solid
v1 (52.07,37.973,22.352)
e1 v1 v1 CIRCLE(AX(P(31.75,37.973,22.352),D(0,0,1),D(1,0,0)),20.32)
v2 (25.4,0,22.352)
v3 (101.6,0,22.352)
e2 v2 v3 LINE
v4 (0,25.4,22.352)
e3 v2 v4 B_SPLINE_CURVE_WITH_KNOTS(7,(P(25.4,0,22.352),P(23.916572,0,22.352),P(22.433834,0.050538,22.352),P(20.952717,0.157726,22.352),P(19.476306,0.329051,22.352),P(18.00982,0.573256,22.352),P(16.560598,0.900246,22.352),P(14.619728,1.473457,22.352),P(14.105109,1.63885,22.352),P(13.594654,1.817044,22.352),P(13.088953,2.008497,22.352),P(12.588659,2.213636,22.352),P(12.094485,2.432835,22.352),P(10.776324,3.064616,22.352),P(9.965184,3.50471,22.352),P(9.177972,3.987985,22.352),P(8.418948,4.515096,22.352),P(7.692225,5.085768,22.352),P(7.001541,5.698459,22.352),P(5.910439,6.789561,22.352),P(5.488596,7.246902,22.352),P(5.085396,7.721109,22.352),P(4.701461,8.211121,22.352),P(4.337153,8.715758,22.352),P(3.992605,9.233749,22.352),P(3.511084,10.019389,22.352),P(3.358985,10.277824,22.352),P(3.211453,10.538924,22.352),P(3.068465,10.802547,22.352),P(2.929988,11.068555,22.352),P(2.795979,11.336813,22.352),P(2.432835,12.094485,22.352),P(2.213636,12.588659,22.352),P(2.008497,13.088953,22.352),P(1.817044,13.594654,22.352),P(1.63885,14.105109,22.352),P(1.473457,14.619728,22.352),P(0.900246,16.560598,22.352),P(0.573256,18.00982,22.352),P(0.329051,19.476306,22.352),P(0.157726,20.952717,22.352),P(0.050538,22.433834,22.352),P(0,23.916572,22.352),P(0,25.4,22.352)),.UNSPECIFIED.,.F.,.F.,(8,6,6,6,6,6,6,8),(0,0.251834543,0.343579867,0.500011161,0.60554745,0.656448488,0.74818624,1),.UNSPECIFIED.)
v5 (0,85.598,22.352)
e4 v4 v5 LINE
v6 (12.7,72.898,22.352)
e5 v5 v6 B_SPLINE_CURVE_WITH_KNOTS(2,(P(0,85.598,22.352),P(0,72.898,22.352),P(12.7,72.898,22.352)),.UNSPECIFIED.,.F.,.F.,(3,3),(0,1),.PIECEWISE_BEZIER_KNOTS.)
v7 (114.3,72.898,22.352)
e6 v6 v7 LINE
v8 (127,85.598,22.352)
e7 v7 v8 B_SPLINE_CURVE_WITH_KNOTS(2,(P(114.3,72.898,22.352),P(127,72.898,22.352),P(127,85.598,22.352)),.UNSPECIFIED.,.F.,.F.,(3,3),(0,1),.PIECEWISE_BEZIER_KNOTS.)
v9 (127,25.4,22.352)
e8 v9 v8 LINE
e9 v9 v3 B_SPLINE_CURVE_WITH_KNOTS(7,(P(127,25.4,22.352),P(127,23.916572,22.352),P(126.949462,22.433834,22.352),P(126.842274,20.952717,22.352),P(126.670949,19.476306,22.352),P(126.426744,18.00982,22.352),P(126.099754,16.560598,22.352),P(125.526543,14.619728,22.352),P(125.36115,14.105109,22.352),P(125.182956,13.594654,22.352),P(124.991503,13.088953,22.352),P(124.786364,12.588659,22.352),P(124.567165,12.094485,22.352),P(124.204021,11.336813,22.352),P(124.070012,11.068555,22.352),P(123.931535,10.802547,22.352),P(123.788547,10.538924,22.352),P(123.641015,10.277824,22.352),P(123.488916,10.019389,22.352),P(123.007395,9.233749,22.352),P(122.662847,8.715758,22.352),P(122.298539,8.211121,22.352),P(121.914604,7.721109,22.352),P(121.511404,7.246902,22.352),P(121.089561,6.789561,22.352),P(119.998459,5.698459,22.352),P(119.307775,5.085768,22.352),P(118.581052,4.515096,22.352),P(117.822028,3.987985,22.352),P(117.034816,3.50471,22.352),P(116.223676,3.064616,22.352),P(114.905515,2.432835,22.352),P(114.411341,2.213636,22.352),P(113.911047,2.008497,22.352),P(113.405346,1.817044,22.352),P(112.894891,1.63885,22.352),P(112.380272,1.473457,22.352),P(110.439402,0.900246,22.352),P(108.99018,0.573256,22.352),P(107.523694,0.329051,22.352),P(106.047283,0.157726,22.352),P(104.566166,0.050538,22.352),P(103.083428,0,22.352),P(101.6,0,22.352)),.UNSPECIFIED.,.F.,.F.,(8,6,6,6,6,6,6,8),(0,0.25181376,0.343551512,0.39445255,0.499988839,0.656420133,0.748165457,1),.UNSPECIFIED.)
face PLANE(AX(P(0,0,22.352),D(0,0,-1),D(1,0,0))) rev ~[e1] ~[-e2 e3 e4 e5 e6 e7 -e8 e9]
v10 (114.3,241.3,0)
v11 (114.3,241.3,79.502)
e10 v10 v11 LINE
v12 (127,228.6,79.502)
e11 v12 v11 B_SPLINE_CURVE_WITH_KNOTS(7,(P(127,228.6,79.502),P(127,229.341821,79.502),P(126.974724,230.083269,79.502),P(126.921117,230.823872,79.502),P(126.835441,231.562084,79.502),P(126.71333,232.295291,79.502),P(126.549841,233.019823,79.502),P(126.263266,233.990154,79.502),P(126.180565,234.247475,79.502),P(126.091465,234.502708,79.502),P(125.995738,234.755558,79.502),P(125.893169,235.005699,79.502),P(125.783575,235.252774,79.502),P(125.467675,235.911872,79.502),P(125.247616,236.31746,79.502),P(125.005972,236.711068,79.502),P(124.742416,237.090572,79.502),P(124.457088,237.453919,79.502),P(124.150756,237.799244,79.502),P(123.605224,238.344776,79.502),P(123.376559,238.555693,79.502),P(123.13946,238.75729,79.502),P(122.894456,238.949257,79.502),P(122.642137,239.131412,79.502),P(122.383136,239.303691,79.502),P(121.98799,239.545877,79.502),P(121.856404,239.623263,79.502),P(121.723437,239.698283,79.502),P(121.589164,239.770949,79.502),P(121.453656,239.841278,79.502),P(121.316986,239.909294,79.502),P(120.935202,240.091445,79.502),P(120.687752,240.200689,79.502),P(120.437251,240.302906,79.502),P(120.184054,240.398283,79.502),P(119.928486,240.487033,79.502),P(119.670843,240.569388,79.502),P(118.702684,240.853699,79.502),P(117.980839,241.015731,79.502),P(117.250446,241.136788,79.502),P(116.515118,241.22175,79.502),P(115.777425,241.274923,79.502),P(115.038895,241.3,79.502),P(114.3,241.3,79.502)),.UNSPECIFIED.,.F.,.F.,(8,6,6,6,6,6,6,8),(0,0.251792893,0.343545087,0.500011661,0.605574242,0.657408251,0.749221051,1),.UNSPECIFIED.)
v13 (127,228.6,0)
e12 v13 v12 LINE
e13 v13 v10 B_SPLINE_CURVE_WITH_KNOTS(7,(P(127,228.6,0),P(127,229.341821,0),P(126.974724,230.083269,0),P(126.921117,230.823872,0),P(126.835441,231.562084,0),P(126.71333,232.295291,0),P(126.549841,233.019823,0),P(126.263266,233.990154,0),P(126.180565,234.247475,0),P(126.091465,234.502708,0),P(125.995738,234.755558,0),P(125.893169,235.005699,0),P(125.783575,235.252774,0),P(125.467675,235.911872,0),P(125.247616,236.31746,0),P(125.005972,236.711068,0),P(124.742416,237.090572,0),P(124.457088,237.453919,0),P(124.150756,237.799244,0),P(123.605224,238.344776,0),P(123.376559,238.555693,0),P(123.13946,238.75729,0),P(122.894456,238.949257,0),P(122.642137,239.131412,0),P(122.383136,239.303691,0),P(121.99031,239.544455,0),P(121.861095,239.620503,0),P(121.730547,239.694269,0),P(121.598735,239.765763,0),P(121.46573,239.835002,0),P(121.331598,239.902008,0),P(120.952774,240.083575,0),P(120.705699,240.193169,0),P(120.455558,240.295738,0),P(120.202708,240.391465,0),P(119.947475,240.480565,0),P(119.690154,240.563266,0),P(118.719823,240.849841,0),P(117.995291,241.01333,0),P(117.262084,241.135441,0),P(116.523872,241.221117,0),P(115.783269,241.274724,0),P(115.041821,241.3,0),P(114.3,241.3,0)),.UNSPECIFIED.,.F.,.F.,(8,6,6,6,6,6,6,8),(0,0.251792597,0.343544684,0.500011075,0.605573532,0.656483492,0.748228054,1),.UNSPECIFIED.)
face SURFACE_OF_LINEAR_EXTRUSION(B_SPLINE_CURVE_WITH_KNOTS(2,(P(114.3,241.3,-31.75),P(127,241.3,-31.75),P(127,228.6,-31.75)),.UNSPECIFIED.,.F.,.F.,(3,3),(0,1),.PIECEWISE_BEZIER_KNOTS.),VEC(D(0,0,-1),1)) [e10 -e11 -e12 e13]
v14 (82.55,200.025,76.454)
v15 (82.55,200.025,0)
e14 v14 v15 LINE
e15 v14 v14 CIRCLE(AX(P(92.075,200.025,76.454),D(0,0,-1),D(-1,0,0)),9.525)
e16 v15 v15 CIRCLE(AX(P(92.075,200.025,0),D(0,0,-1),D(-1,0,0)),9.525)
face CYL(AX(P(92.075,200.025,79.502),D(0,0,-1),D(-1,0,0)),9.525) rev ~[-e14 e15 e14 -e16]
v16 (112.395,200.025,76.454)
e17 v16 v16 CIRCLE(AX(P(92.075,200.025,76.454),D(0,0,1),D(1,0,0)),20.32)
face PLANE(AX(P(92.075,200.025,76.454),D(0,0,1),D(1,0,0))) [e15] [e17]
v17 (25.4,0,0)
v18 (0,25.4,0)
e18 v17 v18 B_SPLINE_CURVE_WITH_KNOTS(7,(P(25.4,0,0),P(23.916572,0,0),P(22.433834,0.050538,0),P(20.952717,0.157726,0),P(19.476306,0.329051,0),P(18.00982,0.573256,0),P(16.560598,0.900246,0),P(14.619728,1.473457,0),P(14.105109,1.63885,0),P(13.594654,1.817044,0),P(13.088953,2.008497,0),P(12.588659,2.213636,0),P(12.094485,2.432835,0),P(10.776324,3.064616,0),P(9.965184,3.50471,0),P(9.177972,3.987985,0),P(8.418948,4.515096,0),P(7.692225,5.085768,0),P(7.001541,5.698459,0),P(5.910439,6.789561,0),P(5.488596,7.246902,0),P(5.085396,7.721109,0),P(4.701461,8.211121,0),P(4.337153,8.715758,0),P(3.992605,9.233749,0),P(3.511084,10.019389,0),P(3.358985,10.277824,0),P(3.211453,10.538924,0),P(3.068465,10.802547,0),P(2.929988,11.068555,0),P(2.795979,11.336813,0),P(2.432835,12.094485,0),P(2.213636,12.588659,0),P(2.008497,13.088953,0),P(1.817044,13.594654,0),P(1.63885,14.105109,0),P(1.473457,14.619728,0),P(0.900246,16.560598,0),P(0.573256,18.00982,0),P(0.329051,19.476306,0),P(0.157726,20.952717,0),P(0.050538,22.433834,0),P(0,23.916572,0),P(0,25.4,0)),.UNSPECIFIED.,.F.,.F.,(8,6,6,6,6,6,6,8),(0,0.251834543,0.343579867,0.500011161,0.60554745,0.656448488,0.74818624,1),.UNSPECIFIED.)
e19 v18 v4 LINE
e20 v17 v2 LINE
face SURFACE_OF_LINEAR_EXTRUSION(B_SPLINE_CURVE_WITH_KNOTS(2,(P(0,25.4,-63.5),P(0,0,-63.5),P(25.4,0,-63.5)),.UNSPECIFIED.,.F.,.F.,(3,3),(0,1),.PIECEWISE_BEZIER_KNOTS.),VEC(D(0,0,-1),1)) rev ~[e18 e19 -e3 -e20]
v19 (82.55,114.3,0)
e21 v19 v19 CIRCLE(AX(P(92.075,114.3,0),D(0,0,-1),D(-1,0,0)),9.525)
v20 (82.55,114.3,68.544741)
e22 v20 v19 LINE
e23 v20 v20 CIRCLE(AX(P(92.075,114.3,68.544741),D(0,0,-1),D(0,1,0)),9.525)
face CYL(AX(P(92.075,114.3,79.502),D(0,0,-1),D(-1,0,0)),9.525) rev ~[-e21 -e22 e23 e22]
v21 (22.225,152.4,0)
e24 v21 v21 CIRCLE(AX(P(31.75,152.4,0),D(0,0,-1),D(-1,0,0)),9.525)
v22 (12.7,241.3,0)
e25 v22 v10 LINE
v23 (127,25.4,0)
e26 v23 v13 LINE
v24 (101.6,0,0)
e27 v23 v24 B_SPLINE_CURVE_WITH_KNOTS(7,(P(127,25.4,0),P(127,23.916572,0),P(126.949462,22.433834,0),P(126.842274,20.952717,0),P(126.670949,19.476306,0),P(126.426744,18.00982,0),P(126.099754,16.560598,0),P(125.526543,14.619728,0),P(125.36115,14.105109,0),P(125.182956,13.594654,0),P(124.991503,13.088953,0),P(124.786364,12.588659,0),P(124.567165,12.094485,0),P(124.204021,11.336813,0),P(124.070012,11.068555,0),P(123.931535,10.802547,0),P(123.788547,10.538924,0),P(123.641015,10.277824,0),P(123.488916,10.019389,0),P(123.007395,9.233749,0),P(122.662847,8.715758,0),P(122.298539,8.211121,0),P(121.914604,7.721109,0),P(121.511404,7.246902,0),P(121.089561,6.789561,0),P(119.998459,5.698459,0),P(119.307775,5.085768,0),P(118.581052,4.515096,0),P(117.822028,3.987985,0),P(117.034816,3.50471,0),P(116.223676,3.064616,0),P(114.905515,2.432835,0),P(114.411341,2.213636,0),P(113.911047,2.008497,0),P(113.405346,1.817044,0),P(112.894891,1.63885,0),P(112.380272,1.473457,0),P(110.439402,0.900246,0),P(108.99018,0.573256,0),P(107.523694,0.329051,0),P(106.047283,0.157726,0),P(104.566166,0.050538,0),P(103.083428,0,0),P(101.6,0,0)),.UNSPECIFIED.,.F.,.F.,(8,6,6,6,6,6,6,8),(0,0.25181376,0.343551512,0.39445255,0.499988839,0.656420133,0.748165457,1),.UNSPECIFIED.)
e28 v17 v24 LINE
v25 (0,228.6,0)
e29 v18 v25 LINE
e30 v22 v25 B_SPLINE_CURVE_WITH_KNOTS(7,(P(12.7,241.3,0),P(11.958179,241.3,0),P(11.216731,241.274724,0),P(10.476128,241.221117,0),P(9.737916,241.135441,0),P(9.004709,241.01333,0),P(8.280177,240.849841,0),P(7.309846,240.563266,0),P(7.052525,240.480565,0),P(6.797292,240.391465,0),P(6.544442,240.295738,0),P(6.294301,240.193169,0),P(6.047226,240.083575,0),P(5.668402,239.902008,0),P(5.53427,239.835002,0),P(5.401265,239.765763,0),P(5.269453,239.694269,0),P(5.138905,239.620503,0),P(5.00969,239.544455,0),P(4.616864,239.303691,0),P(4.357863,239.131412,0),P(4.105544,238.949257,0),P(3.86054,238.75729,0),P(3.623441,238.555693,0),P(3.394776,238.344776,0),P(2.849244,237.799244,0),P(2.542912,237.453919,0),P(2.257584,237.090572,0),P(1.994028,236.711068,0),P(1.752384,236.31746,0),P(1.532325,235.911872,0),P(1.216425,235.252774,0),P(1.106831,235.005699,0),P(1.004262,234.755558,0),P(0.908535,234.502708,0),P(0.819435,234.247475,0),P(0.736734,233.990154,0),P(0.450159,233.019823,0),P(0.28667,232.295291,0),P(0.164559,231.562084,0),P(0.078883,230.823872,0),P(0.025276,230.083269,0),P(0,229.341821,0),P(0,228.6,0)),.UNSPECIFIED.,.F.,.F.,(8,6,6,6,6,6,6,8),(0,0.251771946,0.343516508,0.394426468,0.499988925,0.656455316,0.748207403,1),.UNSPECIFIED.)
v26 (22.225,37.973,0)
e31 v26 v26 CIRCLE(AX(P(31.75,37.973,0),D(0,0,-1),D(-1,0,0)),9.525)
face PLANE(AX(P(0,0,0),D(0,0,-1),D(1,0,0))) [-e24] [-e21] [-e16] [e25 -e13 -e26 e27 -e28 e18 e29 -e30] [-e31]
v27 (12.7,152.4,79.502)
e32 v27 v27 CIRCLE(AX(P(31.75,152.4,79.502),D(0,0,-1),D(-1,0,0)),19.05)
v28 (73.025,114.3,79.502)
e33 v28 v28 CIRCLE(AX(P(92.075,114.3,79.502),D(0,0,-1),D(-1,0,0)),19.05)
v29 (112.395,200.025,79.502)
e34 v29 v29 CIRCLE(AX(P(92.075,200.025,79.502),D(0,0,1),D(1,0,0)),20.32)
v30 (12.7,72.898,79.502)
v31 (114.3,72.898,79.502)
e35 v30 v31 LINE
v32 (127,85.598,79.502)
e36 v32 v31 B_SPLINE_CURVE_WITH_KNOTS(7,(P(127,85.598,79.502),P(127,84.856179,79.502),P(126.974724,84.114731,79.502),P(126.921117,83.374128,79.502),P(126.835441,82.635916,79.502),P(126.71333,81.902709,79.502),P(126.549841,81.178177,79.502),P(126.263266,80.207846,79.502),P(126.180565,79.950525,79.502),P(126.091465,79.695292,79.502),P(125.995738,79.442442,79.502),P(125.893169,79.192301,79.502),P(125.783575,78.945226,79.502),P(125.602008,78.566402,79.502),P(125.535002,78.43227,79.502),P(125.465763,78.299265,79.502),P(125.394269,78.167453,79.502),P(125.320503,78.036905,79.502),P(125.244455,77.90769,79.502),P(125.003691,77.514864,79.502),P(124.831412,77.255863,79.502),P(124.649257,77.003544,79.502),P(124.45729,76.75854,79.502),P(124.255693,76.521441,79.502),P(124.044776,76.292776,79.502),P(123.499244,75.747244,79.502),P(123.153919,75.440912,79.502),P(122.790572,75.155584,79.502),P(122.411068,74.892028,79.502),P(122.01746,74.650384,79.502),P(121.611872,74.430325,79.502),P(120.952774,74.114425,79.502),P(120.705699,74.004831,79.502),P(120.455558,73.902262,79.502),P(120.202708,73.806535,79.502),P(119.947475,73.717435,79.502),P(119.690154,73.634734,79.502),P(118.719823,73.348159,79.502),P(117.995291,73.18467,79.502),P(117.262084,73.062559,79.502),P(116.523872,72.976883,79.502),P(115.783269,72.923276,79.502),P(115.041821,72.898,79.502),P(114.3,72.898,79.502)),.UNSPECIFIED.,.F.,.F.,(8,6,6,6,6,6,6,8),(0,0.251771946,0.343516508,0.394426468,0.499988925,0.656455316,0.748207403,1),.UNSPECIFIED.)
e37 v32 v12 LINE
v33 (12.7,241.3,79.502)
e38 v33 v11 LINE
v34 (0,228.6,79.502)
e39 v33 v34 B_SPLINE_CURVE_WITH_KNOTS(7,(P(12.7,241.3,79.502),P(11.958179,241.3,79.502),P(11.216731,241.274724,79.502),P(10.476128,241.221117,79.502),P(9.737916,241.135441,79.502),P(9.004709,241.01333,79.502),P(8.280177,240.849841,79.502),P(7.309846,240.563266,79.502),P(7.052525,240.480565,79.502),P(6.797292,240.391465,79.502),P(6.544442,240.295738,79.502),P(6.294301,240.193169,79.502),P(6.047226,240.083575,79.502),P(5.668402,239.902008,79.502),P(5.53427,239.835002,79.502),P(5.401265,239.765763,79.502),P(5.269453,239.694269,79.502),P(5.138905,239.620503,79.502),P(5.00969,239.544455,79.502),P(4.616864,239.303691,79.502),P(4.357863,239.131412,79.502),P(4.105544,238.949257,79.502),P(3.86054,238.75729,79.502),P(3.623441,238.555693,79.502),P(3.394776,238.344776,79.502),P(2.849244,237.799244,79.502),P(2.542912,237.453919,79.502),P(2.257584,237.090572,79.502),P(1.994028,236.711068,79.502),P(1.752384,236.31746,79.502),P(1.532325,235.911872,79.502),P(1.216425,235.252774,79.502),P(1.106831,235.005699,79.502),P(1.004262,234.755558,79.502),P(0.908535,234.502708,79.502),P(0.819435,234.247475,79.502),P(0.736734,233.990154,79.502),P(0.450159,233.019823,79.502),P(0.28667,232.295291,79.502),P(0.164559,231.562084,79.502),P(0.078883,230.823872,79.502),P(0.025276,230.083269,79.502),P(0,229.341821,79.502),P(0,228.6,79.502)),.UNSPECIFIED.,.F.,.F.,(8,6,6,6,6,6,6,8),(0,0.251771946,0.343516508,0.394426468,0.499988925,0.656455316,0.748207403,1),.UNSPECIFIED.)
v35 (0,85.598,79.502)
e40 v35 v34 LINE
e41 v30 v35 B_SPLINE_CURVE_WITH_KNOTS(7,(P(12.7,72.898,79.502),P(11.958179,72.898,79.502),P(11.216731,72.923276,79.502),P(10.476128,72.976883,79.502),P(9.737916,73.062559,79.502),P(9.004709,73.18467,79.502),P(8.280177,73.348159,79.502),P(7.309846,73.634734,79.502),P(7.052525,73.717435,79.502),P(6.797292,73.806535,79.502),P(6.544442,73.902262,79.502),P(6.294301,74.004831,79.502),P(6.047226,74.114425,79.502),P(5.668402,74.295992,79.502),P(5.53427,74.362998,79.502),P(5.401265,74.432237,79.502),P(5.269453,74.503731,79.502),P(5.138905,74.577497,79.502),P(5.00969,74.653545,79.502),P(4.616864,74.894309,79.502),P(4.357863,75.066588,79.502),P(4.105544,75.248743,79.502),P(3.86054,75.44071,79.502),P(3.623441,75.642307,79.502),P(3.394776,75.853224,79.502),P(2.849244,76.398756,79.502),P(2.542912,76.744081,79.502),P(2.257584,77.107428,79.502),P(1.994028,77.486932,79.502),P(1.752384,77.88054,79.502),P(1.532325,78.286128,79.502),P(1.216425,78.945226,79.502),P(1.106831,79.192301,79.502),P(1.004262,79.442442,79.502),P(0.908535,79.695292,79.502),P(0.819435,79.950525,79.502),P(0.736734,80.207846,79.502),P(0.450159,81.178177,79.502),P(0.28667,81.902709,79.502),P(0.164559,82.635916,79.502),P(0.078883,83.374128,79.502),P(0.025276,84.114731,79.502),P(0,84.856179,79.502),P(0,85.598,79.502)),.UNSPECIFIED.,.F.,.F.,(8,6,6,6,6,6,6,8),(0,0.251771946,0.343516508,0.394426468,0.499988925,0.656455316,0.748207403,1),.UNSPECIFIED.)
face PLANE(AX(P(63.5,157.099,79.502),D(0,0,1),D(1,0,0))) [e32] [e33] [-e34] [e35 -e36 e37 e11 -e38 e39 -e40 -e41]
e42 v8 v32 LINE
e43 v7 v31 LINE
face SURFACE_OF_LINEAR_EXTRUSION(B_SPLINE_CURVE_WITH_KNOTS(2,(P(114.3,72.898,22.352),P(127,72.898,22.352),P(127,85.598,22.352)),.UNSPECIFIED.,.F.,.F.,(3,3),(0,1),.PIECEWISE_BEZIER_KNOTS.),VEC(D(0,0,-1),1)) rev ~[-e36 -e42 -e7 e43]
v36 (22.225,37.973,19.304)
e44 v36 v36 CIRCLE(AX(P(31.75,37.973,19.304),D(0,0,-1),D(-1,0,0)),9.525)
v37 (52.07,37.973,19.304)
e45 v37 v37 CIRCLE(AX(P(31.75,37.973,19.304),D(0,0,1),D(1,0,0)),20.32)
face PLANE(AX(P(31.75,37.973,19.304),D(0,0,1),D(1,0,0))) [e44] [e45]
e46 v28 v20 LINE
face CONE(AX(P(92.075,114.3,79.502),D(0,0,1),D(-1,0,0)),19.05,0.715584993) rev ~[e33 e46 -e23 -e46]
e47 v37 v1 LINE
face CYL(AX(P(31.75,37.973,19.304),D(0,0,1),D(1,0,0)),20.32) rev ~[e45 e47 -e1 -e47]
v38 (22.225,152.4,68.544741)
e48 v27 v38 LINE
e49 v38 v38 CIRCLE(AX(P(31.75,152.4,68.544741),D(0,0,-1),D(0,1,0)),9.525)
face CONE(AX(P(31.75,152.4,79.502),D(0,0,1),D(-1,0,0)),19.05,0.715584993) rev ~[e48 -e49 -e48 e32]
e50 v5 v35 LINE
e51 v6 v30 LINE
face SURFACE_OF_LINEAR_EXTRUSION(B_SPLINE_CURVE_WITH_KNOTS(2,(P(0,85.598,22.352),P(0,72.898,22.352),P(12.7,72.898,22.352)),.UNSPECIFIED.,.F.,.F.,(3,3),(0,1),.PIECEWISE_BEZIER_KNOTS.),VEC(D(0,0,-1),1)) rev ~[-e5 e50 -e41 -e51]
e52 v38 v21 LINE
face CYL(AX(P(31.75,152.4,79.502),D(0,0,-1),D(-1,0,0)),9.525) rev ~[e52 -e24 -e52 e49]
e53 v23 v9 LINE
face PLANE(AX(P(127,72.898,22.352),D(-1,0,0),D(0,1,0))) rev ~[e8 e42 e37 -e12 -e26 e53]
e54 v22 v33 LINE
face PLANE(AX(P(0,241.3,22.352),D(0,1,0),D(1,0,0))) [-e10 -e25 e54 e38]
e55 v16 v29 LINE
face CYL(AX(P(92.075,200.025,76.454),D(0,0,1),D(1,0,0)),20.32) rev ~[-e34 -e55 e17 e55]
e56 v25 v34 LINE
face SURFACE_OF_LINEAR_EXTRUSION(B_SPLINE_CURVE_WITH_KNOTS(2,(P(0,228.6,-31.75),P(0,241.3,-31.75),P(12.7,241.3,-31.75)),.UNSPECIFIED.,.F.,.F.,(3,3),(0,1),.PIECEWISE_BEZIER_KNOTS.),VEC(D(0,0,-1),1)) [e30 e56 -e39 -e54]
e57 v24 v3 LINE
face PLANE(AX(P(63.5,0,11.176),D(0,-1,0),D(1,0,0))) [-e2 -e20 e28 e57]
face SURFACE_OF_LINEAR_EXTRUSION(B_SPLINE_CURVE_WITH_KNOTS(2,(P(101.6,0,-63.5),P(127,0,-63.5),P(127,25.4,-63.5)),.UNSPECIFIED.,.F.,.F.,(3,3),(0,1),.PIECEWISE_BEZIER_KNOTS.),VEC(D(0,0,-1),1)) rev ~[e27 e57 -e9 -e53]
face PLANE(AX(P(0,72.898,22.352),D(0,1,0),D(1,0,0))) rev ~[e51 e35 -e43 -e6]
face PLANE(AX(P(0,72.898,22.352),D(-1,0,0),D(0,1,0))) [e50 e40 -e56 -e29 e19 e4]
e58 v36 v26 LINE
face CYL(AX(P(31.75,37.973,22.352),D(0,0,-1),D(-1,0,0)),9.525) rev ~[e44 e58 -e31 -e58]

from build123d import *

# Parameters (mm, degrees)
F0_W           = 127
F0_H           = 22.352
F1_DEPTH       = 241.3
F2_W           = 127
F2_H           = 168.402
F3_DEPTH       = 57.15
F5_D           = 19.05
F5_CSINK_D     = 38.1
F5_CSINK_ANGLE = 82
F6_D           = 19.05
F6_START       = 57.15
F6_CBORE_D     = 40.64
F6_CBORE_DEPTH = 3.048
F7_T1_DEPTH    = 149.352
F8_T1_DEPTH    = 88.9
F9_T1_DEPTH    = 88.9
F10_T1_DEPTH   = 149.352
F11_T1_DEPTH   = 143.002
F12_T1_DEPTH   = 143.002


# Not quite as in the source:
# - a fillet or chamfer that OpenCascade refuses, or shapes differently, is made with other operations: its cross-section is extruded or revolved along the edge and cut away or added


with BuildPart() as f1:
    # F0 (on Front) → F1 (new body)
    with BuildSketch(Plane.XZ):
        with Locations((63.5, 11.176)):
            Rectangle(F0_W, F0_H)
    extrude(amount=-F1_DEPTH)

    # F2 (on face) → F3 (join)
    with BuildSketch(Plane.XY.offset(22.352)):
        with Locations((63.5, 157.099)):
            Rectangle(F2_W, F2_H)
    extrude(amount=F3_DEPTH)

    # F5 (through all)
    with Locations(Plane.XY.offset(79.502)):
        with Locations((31.75, 152.4), (92.075, 114.3)):
            CounterSinkHole(F5_D / 2, F5_CSINK_D / 2, counter_sink_angle=F5_CSINK_ANGLE)

    # F6 (through all)
    # its depths count from where the whole tool has entered the part; down to there all is cleared
    with Locations(Plane.XY.offset(79.502)):
        with Locations((92.075, 200.025, 0), (31.75, 37.973, -F6_START)):
            CounterBoreHole(F6_D / 2, F6_CBORE_D / 2, F6_CBORE_DEPTH)

    # F7: fillet of radius 25.4 on 1 edges, made by hand

    # F7_s2 → F7_t1 (cut)
    with BuildSketch(Plane.XY.offset(-63.5)):
        with BuildLine():
            add(Edge.make_bspline(
                [(101.6, 0), (127, 0), (127, 25.4)],
                knots=[0, 0, 0, 1, 1, 1], degree=2, weights=[1, 1, 1]))
            Line((127, 25.4), (127, 0))
            Line((127, 0), (101.6, 0))
        make_face()
    extrude(amount=F7_T1_DEPTH, mode=Mode.SUBTRACT)

    # F8: fillet of radius 12.7 on 1 edges, made by hand

    # F8_s2 → F8_t1 (cut)
    with BuildSketch(Plane.XY.offset(22.352)):
        with BuildLine():
            add(Edge.make_bspline(
                [(114.3, 72.898), (127, 72.898), (127, 85.598)],
                knots=[0, 0, 0, 1, 1, 1], degree=2, weights=[1, 1, 1]))
            Line((127, 85.598), (127, 72.898))
            Line((127, 72.898), (114.3, 72.898))
        make_face()
    extrude(amount=F8_T1_DEPTH, mode=Mode.SUBTRACT)

    # F9: fillet of radius 12.7 on 1 edges, made by hand

    # F9_s2 → F9_t1 (cut)
    with BuildSketch(Plane.XY.offset(22.352)):
        with BuildLine():
            add(Edge.make_bspline(
                [(0, 85.598), (0, 72.898), (12.7, 72.898)],
                knots=[0, 0, 0, 1, 1, 1], degree=2, weights=[1, 1, 1]))
            Line((12.7, 72.898), (0, 72.898))
            Line((0, 72.898), (0, 85.598))
        make_face()
    extrude(amount=F9_T1_DEPTH, mode=Mode.SUBTRACT)

    # F10: fillet of radius 25.4 on 1 edges, made by hand

    # F10_s2 → F10_t1 (cut)
    with BuildSketch(Plane.XY.offset(-63.5)):
        with BuildLine():
            add(Edge.make_bspline(
                [(0, 25.4), (0, 0), (25.4, 0)],
                knots=[0, 0, 0, 1, 1, 1], degree=2, weights=[1, 1, 1]))
            Line((25.4, 0), (0, 0))
            Line((0, 0), (0, 25.4))
        make_face()
    extrude(amount=F10_T1_DEPTH, mode=Mode.SUBTRACT)

    # F11: fillet of radius 12.7 on 1 edges, made by hand

    # F11_s2 → F11_t1 (cut)
    with BuildSketch(Plane.XY.offset(-31.75)):
        with BuildLine():
            add(Edge.make_bspline(
                [(114.3, 241.3), (127, 241.3), (127, 228.6)],
                knots=[0, 0, 0, 1, 1, 1], degree=2, weights=[1, 1, 1]))
            Line((127, 228.6), (127, 241.3))
            Line((127, 241.3), (114.3, 241.3))
        make_face()
    extrude(amount=F11_T1_DEPTH, mode=Mode.SUBTRACT)

    # F12: fillet of radius 12.7 on 1 edges, made by hand

    # F12_s2 → F12_t1 (cut)
    with BuildSketch(Plane.XY.offset(-31.75)):
        with BuildLine():
            add(Edge.make_bspline(
                [(0, 228.6), (0, 241.3), (12.7, 241.3)],
                knots=[0, 0, 0, 1, 1, 1], degree=2, weights=[1, 1, 1]))
            Line((12.7, 241.3), (0, 241.3))
            Line((0, 241.3), (0, 228.6))
        make_face()
    extrude(amount=F12_T1_DEPTH, mode=Mode.SUBTRACT)


solid = f1.part
